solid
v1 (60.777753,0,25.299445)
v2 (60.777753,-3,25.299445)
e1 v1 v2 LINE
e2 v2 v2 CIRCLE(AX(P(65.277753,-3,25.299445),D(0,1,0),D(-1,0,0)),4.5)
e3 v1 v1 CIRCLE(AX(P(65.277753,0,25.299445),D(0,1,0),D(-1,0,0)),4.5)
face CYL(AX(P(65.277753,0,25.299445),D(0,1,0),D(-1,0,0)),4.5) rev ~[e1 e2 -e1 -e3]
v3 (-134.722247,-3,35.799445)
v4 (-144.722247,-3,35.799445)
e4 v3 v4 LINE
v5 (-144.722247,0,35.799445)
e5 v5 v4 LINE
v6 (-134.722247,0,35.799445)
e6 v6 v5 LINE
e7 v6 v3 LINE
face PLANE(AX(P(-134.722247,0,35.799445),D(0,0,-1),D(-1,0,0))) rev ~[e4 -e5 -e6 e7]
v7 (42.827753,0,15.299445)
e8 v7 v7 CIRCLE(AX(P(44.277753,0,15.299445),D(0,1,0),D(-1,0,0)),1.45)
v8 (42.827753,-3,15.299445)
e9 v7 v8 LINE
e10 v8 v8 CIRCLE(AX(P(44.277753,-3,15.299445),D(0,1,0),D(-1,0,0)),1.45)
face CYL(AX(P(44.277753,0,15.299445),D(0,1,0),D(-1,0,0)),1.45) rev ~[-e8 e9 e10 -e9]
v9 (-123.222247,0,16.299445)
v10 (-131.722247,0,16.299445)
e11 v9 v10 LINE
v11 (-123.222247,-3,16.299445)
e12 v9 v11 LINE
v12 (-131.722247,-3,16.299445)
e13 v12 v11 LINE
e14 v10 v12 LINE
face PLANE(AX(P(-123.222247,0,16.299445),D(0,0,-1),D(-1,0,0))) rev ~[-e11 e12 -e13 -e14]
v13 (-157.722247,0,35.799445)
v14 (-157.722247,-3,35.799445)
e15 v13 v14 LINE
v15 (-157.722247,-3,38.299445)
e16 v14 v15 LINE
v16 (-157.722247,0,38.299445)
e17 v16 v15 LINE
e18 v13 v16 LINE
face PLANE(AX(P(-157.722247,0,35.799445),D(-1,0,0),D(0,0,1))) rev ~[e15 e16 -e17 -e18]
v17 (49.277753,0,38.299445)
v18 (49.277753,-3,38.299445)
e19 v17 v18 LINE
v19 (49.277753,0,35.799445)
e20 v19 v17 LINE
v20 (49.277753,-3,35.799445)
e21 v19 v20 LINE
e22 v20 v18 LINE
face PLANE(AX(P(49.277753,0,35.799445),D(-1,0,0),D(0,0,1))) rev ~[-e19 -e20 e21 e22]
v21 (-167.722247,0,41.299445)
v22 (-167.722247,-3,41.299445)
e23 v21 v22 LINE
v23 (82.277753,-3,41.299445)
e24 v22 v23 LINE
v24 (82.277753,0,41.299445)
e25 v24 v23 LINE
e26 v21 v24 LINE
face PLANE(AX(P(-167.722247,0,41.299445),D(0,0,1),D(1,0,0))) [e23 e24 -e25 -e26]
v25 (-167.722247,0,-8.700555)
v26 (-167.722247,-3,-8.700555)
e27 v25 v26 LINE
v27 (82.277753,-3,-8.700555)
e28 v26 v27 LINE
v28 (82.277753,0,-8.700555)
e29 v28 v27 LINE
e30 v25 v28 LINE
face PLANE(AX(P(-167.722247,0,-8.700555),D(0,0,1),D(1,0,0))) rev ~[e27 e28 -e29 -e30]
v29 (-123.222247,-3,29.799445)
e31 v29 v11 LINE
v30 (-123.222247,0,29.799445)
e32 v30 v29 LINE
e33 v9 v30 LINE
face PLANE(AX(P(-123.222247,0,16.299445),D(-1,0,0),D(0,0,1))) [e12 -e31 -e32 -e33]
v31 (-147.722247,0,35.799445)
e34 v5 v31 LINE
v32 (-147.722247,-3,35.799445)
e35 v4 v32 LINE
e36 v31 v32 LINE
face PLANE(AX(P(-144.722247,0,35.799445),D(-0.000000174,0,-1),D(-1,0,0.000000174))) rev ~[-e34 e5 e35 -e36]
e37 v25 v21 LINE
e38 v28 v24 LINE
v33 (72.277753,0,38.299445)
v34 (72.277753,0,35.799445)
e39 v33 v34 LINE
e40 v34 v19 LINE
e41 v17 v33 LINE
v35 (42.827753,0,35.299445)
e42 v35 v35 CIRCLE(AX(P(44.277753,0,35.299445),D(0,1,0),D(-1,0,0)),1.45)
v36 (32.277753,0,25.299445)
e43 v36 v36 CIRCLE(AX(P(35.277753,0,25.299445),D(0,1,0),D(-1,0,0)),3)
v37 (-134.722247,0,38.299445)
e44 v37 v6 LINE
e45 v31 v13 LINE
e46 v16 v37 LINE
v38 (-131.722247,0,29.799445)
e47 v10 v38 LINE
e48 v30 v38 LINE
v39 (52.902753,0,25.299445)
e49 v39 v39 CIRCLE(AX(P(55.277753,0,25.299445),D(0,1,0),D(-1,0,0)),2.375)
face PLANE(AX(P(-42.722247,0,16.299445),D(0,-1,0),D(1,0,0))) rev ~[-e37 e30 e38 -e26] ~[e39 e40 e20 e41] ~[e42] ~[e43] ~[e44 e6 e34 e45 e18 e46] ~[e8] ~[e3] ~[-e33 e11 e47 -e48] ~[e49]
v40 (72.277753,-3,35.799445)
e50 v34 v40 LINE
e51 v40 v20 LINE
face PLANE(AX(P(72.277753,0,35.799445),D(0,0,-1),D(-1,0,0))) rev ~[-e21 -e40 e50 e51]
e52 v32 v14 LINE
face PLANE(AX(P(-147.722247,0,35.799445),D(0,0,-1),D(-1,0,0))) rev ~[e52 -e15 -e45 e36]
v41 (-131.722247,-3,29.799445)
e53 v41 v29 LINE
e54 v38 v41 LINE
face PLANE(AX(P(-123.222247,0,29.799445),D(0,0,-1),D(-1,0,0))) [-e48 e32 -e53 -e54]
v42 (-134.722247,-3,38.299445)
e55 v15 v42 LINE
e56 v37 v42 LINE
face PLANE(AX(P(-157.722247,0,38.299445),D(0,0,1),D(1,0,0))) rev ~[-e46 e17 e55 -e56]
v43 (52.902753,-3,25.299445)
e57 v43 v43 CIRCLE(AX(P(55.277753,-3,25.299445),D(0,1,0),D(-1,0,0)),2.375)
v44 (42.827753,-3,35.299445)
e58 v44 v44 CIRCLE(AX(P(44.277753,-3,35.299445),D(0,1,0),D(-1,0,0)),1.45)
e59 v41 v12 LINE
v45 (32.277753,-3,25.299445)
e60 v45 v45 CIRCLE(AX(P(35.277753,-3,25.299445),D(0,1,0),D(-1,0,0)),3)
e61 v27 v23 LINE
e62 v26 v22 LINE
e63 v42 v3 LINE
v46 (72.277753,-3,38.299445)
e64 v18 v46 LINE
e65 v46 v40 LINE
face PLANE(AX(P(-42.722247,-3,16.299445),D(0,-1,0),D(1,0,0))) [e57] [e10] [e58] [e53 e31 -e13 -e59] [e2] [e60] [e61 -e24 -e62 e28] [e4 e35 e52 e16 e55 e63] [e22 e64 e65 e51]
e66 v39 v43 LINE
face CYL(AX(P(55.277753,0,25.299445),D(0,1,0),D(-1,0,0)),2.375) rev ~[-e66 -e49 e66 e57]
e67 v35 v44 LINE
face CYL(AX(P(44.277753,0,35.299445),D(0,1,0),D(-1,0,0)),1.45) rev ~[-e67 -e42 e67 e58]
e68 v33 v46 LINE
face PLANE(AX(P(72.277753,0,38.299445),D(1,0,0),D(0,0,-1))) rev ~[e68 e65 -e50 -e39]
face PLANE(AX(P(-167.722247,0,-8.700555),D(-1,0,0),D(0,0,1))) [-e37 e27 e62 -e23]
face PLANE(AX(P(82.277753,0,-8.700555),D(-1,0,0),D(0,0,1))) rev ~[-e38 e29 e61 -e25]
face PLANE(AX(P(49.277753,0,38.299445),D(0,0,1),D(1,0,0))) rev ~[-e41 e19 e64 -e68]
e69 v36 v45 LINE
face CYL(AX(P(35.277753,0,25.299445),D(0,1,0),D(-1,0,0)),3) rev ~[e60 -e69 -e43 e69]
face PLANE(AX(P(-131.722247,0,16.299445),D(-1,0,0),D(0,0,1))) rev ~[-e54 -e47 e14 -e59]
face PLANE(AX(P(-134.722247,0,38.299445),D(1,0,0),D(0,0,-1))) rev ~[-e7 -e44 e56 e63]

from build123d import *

# Parameters (mm, degrees)
F0_W     = 250
F0_H     = 50
F1_DEPTH = 3
F2_DEPTH = 3
F3_R     = 4.5
F3_R_2   = 1.45
F3_R_3   = 2.375
F3_R_4   = 3
F3_W     = 8.5
F3_H     = 13.5
F4_DEPTH = 25


# Not quite as in the source:
# - ends of sketch curves that miss each other by under 0.0002 mm in the source are joined


with BuildPart() as f1:
    # F0 (on Front) → F1 (new body)
    with BuildSketch(Plane.XZ):
        with Locations((-42.7222467884, 16.2994446903)):
            Rectangle(F0_W, F0_H)
        Polygon((-147.7222467884, 35.7994452119), (-157.7222467884, 35.7994452119), (-157.7222467884, 38.2994446903), (-134.7222467884, 38.2994446903), (-134.7222467884, 35.7994446903), (-144.7222467884, 35.7994446903), align=None, mode=Mode.SUBTRACT)
        Polygon((49.2777532116, 38.2994446903), (62.2777532116, 38.2994446903), (72.2777532116, 38.2994446903), (72.2777532116, 35.7994446903), (49.2777532116, 35.7994446903), align=None, mode=Mode.SUBTRACT)
    extrude(amount=F1_DEPTH)

    # F0 (on Front) → F2 (join)
    with BuildSketch(Plane.XZ):
        with Locations((-42.7222467884, 16.2994446903)):
            Rectangle(F0_W, F0_H)
        Polygon((-147.7222467884, 35.7994452119), (-157.7222467884, 35.7994452119), (-157.7222467884, 38.2994446903), (-134.7222467884, 38.2994446903), (-134.7222467884, 35.7994446903), (-144.7222467884, 35.7994446903), align=None, mode=Mode.SUBTRACT)
        Polygon((49.2777532116, 38.2994446903), (62.2777532116, 38.2994446903), (72.2777532116, 38.2994446903), (72.2777532116, 35.7994446903), (49.2777532116, 35.7994446903), align=None, mode=Mode.SUBTRACT)
    extrude(amount=F2_DEPTH)

    # F3 (on face) → F4 (cut)
    with BuildSketch(Plane(origin=(0, 0, 0), x_dir=(-1, 0, 0), z_dir=(0, 1, 0))):
        with Locations((-65.2777532116, 25.2994446903)):
            Circle(F3_R)
        with Locations((-44.2777532116, 15.2994446903)):
            Circle(F3_R_2)
        with Locations((-44.2777532116, 35.2994446903)):
            Circle(F3_R_2)
        with Locations((-55.2777532116, 25.2994446903)):
            Circle(F3_R_3)
        with Locations((-35.2777532116, 25.2994446903)):
            Circle(F3_R_4)
        with Locations((127.4722467884, 23.0494446903)):
            Rectangle(F3_W, F3_H)
    extrude(amount=-F4_DEPTH, mode=Mode.SUBTRACT)


solid = f1.part
